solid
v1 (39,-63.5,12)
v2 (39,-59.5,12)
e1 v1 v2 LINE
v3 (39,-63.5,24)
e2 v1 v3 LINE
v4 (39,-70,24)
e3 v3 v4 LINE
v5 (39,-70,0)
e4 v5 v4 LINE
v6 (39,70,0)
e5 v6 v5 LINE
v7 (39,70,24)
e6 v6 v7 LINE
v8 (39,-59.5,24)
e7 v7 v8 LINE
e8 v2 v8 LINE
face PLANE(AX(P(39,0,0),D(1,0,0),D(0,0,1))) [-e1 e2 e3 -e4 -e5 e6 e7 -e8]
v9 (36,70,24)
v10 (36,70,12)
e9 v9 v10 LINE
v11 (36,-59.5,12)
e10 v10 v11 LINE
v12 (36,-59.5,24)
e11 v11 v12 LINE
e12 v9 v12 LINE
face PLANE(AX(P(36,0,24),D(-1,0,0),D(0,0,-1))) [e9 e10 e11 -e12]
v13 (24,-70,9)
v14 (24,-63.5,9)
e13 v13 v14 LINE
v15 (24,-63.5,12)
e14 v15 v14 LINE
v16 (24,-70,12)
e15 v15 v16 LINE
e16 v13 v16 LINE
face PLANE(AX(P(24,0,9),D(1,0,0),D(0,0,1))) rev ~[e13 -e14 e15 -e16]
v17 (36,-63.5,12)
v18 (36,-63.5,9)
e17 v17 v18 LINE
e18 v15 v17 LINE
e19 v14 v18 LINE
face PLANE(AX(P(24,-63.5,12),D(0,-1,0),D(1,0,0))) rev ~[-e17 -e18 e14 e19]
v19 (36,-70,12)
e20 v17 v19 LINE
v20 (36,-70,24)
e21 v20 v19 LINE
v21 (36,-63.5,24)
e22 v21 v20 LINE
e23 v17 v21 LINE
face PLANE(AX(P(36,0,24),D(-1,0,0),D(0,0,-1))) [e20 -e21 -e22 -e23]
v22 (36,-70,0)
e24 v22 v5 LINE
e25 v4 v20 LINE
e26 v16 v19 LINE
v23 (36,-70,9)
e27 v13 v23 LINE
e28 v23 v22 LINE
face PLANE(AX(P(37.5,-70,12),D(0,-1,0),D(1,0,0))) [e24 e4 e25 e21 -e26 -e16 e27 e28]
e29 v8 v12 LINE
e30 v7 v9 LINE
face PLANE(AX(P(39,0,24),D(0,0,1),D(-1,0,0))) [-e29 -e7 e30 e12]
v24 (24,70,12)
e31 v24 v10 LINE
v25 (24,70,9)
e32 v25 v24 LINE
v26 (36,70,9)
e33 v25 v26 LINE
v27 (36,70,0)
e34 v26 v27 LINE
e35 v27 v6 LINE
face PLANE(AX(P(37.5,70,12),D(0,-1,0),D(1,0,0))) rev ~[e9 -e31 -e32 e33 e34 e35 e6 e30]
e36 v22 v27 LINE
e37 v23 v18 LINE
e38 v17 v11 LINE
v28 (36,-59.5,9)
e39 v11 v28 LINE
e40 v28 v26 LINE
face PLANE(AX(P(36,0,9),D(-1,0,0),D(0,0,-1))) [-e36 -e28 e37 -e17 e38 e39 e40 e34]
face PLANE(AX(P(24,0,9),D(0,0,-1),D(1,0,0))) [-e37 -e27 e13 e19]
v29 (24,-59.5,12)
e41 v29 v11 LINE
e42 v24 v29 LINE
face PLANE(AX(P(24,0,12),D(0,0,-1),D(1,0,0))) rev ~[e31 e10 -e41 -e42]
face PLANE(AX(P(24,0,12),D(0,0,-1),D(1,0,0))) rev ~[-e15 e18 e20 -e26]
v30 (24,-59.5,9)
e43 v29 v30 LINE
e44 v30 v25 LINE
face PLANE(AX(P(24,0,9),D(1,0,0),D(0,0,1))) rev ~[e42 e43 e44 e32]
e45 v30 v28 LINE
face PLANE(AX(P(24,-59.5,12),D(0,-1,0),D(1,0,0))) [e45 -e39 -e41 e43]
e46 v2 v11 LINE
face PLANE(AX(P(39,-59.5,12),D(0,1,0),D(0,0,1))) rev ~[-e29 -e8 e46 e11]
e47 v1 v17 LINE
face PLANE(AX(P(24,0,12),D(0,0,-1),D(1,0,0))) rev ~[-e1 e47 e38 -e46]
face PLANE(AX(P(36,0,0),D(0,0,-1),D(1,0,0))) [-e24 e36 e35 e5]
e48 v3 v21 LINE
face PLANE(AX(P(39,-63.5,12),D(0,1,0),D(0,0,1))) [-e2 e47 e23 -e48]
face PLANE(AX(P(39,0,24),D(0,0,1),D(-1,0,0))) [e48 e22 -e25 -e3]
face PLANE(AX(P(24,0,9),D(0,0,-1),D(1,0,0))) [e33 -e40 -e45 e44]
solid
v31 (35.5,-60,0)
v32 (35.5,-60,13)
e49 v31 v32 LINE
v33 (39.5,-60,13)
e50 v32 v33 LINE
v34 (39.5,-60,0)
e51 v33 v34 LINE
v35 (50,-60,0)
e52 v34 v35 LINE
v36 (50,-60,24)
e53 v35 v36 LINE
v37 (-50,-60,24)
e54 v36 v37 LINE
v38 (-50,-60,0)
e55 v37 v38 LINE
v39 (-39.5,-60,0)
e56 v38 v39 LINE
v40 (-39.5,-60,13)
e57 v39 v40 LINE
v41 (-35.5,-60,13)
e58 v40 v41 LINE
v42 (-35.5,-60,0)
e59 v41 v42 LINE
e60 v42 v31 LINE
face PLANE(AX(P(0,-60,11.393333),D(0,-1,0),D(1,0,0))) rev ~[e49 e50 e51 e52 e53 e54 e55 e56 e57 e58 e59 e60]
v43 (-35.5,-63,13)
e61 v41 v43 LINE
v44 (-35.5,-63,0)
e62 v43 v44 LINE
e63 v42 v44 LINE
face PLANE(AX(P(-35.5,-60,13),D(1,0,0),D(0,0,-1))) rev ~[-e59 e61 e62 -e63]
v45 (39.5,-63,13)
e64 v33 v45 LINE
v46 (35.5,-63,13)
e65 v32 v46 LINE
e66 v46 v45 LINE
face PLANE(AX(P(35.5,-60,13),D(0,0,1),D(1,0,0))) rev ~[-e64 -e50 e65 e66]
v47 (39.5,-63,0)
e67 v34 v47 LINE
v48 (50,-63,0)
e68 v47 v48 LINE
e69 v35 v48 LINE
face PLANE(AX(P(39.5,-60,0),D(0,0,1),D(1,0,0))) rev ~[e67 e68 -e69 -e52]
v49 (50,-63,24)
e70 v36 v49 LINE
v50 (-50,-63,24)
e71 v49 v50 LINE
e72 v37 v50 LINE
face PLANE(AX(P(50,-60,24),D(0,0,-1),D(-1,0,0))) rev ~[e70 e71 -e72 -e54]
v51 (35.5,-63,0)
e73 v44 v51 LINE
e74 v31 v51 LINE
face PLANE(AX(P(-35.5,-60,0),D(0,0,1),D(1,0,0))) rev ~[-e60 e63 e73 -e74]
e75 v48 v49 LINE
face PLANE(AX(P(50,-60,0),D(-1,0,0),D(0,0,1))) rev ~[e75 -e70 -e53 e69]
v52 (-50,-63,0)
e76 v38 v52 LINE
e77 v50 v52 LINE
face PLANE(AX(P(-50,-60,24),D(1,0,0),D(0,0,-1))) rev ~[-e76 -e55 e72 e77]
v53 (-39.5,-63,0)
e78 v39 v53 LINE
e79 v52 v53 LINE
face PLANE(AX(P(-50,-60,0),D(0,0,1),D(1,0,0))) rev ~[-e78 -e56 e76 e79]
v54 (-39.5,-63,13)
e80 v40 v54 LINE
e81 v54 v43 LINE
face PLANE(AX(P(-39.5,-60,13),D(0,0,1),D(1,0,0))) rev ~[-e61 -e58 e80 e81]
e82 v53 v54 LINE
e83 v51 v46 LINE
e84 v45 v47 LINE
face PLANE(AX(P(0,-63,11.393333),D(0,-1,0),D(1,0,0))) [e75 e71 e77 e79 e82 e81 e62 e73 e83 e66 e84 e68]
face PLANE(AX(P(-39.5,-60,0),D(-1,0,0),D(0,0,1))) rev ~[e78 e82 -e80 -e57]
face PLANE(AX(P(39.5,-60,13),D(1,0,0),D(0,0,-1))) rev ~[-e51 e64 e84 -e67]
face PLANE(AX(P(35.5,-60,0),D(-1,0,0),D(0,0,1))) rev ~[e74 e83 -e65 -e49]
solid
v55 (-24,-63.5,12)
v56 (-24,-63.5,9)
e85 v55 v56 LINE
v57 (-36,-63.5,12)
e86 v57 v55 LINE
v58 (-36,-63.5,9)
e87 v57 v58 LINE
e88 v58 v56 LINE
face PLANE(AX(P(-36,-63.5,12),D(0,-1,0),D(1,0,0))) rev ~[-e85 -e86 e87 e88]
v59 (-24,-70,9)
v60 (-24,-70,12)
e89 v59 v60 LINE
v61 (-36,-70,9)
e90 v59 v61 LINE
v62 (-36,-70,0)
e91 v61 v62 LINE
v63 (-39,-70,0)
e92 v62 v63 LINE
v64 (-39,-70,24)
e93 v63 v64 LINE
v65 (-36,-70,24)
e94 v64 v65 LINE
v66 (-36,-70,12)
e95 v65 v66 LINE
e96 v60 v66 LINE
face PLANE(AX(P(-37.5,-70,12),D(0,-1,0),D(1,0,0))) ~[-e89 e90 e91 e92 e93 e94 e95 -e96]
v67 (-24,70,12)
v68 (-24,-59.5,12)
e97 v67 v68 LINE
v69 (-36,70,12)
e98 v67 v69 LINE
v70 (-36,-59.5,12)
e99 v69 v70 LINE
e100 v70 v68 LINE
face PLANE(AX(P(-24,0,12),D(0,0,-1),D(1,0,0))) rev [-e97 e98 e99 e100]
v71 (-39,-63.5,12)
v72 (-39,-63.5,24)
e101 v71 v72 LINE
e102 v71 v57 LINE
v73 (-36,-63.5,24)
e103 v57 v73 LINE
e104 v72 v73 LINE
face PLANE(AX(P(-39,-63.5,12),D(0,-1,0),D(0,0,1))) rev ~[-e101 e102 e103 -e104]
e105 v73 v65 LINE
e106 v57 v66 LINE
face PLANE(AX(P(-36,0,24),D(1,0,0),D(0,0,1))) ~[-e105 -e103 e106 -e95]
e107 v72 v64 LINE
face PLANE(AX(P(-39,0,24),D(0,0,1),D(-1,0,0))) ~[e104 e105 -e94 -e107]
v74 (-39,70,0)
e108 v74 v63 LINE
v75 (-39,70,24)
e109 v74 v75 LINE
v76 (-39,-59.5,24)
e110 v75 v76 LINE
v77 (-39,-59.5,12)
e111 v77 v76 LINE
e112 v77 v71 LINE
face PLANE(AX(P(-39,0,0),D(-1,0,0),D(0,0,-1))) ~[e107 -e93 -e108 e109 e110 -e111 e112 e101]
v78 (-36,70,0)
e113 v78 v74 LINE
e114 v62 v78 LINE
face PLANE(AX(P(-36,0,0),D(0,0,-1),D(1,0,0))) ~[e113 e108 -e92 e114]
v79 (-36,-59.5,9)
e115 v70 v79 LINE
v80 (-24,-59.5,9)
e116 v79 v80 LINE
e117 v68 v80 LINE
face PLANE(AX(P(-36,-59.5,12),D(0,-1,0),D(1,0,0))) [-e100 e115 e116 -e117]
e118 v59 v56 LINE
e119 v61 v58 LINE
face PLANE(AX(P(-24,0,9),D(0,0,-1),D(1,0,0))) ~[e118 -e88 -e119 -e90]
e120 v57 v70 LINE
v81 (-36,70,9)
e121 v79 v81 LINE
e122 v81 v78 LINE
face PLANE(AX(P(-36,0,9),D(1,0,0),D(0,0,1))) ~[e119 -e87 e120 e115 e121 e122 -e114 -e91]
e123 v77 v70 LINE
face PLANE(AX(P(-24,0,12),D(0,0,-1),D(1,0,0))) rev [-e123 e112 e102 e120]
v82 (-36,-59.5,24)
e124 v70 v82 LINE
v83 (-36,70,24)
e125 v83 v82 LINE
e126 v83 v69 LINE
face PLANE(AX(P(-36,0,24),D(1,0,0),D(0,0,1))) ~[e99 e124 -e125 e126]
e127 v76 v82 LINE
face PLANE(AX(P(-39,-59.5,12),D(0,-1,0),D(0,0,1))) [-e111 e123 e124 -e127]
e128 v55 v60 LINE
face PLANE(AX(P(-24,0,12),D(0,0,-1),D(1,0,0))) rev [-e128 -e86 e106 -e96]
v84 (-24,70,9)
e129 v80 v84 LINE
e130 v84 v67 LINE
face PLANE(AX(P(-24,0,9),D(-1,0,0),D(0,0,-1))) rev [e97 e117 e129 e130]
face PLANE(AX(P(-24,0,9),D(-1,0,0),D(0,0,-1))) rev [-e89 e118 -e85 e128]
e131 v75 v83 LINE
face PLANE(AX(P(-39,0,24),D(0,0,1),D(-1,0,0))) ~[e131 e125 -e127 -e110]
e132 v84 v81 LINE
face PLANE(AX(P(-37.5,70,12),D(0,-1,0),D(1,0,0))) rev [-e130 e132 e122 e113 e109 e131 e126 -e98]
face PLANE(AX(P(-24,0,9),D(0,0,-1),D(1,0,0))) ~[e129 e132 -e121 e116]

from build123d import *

# Parameters (mm, degrees)
F0_W          = 12
F0_H          = 3
F1_DEPTH      = 70
F1_DEPTH_BACK = 70
F5_DEPTH      = 3
F6_W          = 4
F6_H          = 12
F7_DEPTH      = 3
F8_W          = 4
F8_H          = 12
F9_DEPTH      = 3
F10_W         = 12
F10_H         = 4
F11_DEPTH     = 3
F12_W         = 12
F12_H         = 4
F13_DEPTH     = 3


with BuildPart() as f1:
    # F0 (on Front) → F1 (new body, two sides)
    with BuildSketch(Plane.XZ) as f1_sk:
        Polygon((36, 9), (36, 0), (39, 0), (39, 24), (36, 24), (36, 12), align=None)
        with Locations((30, 10.5)):
            Rectangle(F0_W, F0_H)
    extrude(amount=F1_DEPTH)
    extrude(f1_sk.sketch, amount=-F1_DEPTH_BACK)


with BuildPart() as f2_1:
    # F2: instance of F1
    add(f1.part.mirror(Plane.YZ))

    # F8 (on face) → F9 (cut, through all)
    with BuildSketch(Plane(origin=(-39, 0, 0), x_dir=(0, -1, 0), z_dir=(-1, 0, 0))):
        with Locations((61.5, 18)):
            Rectangle(F8_W, F8_H)
    extrude(amount=-F9_DEPTH, mode=Mode.SUBTRACT)

    # F12 (on face) → F13 (cut, through all)
    with BuildSketch(Plane.XY.offset(12)):
        with Locations((-30, -61.5)):
            Rectangle(F12_W, F12_H)
    extrude(amount=-F13_DEPTH, mode=Mode.SUBTRACT)


with BuildPart() as f5:
    # F4 (on offset) → F5 (new body)
    with BuildSketch(Plane.XZ.offset(60)):
        Polygon((-50, 24), (-50, 0), (-39.5, 0), (-39.5, 13), (-35.5, 13), (-35.5, 0), (35.5, 0), (35.5, 13), (39.5, 13), (39.5, 0), (50, 0), (50, 24), align=None)
    extrude(amount=F5_DEPTH)


with BuildPart() as f1_1:
    add(f1.part)

    # F6 (on face) → F7 (cut, through all)
    with BuildSketch(Plane.YZ.offset(39)):
        with Locations((-61.5, 18)):
            Rectangle(F6_W, F6_H)
    extrude(amount=-F7_DEPTH, mode=Mode.SUBTRACT)

    # F10 (on face) → F11 (cut, through all)
    with BuildSketch(Plane.XY.offset(12)):
        with Locations((30, -61.5)):
            Rectangle(F10_W, F10_H)
    extrude(amount=-F11_DEPTH, mode=Mode.SUBTRACT)


solid = Compound([f2_1.part, f5.part, f1_1.part])
